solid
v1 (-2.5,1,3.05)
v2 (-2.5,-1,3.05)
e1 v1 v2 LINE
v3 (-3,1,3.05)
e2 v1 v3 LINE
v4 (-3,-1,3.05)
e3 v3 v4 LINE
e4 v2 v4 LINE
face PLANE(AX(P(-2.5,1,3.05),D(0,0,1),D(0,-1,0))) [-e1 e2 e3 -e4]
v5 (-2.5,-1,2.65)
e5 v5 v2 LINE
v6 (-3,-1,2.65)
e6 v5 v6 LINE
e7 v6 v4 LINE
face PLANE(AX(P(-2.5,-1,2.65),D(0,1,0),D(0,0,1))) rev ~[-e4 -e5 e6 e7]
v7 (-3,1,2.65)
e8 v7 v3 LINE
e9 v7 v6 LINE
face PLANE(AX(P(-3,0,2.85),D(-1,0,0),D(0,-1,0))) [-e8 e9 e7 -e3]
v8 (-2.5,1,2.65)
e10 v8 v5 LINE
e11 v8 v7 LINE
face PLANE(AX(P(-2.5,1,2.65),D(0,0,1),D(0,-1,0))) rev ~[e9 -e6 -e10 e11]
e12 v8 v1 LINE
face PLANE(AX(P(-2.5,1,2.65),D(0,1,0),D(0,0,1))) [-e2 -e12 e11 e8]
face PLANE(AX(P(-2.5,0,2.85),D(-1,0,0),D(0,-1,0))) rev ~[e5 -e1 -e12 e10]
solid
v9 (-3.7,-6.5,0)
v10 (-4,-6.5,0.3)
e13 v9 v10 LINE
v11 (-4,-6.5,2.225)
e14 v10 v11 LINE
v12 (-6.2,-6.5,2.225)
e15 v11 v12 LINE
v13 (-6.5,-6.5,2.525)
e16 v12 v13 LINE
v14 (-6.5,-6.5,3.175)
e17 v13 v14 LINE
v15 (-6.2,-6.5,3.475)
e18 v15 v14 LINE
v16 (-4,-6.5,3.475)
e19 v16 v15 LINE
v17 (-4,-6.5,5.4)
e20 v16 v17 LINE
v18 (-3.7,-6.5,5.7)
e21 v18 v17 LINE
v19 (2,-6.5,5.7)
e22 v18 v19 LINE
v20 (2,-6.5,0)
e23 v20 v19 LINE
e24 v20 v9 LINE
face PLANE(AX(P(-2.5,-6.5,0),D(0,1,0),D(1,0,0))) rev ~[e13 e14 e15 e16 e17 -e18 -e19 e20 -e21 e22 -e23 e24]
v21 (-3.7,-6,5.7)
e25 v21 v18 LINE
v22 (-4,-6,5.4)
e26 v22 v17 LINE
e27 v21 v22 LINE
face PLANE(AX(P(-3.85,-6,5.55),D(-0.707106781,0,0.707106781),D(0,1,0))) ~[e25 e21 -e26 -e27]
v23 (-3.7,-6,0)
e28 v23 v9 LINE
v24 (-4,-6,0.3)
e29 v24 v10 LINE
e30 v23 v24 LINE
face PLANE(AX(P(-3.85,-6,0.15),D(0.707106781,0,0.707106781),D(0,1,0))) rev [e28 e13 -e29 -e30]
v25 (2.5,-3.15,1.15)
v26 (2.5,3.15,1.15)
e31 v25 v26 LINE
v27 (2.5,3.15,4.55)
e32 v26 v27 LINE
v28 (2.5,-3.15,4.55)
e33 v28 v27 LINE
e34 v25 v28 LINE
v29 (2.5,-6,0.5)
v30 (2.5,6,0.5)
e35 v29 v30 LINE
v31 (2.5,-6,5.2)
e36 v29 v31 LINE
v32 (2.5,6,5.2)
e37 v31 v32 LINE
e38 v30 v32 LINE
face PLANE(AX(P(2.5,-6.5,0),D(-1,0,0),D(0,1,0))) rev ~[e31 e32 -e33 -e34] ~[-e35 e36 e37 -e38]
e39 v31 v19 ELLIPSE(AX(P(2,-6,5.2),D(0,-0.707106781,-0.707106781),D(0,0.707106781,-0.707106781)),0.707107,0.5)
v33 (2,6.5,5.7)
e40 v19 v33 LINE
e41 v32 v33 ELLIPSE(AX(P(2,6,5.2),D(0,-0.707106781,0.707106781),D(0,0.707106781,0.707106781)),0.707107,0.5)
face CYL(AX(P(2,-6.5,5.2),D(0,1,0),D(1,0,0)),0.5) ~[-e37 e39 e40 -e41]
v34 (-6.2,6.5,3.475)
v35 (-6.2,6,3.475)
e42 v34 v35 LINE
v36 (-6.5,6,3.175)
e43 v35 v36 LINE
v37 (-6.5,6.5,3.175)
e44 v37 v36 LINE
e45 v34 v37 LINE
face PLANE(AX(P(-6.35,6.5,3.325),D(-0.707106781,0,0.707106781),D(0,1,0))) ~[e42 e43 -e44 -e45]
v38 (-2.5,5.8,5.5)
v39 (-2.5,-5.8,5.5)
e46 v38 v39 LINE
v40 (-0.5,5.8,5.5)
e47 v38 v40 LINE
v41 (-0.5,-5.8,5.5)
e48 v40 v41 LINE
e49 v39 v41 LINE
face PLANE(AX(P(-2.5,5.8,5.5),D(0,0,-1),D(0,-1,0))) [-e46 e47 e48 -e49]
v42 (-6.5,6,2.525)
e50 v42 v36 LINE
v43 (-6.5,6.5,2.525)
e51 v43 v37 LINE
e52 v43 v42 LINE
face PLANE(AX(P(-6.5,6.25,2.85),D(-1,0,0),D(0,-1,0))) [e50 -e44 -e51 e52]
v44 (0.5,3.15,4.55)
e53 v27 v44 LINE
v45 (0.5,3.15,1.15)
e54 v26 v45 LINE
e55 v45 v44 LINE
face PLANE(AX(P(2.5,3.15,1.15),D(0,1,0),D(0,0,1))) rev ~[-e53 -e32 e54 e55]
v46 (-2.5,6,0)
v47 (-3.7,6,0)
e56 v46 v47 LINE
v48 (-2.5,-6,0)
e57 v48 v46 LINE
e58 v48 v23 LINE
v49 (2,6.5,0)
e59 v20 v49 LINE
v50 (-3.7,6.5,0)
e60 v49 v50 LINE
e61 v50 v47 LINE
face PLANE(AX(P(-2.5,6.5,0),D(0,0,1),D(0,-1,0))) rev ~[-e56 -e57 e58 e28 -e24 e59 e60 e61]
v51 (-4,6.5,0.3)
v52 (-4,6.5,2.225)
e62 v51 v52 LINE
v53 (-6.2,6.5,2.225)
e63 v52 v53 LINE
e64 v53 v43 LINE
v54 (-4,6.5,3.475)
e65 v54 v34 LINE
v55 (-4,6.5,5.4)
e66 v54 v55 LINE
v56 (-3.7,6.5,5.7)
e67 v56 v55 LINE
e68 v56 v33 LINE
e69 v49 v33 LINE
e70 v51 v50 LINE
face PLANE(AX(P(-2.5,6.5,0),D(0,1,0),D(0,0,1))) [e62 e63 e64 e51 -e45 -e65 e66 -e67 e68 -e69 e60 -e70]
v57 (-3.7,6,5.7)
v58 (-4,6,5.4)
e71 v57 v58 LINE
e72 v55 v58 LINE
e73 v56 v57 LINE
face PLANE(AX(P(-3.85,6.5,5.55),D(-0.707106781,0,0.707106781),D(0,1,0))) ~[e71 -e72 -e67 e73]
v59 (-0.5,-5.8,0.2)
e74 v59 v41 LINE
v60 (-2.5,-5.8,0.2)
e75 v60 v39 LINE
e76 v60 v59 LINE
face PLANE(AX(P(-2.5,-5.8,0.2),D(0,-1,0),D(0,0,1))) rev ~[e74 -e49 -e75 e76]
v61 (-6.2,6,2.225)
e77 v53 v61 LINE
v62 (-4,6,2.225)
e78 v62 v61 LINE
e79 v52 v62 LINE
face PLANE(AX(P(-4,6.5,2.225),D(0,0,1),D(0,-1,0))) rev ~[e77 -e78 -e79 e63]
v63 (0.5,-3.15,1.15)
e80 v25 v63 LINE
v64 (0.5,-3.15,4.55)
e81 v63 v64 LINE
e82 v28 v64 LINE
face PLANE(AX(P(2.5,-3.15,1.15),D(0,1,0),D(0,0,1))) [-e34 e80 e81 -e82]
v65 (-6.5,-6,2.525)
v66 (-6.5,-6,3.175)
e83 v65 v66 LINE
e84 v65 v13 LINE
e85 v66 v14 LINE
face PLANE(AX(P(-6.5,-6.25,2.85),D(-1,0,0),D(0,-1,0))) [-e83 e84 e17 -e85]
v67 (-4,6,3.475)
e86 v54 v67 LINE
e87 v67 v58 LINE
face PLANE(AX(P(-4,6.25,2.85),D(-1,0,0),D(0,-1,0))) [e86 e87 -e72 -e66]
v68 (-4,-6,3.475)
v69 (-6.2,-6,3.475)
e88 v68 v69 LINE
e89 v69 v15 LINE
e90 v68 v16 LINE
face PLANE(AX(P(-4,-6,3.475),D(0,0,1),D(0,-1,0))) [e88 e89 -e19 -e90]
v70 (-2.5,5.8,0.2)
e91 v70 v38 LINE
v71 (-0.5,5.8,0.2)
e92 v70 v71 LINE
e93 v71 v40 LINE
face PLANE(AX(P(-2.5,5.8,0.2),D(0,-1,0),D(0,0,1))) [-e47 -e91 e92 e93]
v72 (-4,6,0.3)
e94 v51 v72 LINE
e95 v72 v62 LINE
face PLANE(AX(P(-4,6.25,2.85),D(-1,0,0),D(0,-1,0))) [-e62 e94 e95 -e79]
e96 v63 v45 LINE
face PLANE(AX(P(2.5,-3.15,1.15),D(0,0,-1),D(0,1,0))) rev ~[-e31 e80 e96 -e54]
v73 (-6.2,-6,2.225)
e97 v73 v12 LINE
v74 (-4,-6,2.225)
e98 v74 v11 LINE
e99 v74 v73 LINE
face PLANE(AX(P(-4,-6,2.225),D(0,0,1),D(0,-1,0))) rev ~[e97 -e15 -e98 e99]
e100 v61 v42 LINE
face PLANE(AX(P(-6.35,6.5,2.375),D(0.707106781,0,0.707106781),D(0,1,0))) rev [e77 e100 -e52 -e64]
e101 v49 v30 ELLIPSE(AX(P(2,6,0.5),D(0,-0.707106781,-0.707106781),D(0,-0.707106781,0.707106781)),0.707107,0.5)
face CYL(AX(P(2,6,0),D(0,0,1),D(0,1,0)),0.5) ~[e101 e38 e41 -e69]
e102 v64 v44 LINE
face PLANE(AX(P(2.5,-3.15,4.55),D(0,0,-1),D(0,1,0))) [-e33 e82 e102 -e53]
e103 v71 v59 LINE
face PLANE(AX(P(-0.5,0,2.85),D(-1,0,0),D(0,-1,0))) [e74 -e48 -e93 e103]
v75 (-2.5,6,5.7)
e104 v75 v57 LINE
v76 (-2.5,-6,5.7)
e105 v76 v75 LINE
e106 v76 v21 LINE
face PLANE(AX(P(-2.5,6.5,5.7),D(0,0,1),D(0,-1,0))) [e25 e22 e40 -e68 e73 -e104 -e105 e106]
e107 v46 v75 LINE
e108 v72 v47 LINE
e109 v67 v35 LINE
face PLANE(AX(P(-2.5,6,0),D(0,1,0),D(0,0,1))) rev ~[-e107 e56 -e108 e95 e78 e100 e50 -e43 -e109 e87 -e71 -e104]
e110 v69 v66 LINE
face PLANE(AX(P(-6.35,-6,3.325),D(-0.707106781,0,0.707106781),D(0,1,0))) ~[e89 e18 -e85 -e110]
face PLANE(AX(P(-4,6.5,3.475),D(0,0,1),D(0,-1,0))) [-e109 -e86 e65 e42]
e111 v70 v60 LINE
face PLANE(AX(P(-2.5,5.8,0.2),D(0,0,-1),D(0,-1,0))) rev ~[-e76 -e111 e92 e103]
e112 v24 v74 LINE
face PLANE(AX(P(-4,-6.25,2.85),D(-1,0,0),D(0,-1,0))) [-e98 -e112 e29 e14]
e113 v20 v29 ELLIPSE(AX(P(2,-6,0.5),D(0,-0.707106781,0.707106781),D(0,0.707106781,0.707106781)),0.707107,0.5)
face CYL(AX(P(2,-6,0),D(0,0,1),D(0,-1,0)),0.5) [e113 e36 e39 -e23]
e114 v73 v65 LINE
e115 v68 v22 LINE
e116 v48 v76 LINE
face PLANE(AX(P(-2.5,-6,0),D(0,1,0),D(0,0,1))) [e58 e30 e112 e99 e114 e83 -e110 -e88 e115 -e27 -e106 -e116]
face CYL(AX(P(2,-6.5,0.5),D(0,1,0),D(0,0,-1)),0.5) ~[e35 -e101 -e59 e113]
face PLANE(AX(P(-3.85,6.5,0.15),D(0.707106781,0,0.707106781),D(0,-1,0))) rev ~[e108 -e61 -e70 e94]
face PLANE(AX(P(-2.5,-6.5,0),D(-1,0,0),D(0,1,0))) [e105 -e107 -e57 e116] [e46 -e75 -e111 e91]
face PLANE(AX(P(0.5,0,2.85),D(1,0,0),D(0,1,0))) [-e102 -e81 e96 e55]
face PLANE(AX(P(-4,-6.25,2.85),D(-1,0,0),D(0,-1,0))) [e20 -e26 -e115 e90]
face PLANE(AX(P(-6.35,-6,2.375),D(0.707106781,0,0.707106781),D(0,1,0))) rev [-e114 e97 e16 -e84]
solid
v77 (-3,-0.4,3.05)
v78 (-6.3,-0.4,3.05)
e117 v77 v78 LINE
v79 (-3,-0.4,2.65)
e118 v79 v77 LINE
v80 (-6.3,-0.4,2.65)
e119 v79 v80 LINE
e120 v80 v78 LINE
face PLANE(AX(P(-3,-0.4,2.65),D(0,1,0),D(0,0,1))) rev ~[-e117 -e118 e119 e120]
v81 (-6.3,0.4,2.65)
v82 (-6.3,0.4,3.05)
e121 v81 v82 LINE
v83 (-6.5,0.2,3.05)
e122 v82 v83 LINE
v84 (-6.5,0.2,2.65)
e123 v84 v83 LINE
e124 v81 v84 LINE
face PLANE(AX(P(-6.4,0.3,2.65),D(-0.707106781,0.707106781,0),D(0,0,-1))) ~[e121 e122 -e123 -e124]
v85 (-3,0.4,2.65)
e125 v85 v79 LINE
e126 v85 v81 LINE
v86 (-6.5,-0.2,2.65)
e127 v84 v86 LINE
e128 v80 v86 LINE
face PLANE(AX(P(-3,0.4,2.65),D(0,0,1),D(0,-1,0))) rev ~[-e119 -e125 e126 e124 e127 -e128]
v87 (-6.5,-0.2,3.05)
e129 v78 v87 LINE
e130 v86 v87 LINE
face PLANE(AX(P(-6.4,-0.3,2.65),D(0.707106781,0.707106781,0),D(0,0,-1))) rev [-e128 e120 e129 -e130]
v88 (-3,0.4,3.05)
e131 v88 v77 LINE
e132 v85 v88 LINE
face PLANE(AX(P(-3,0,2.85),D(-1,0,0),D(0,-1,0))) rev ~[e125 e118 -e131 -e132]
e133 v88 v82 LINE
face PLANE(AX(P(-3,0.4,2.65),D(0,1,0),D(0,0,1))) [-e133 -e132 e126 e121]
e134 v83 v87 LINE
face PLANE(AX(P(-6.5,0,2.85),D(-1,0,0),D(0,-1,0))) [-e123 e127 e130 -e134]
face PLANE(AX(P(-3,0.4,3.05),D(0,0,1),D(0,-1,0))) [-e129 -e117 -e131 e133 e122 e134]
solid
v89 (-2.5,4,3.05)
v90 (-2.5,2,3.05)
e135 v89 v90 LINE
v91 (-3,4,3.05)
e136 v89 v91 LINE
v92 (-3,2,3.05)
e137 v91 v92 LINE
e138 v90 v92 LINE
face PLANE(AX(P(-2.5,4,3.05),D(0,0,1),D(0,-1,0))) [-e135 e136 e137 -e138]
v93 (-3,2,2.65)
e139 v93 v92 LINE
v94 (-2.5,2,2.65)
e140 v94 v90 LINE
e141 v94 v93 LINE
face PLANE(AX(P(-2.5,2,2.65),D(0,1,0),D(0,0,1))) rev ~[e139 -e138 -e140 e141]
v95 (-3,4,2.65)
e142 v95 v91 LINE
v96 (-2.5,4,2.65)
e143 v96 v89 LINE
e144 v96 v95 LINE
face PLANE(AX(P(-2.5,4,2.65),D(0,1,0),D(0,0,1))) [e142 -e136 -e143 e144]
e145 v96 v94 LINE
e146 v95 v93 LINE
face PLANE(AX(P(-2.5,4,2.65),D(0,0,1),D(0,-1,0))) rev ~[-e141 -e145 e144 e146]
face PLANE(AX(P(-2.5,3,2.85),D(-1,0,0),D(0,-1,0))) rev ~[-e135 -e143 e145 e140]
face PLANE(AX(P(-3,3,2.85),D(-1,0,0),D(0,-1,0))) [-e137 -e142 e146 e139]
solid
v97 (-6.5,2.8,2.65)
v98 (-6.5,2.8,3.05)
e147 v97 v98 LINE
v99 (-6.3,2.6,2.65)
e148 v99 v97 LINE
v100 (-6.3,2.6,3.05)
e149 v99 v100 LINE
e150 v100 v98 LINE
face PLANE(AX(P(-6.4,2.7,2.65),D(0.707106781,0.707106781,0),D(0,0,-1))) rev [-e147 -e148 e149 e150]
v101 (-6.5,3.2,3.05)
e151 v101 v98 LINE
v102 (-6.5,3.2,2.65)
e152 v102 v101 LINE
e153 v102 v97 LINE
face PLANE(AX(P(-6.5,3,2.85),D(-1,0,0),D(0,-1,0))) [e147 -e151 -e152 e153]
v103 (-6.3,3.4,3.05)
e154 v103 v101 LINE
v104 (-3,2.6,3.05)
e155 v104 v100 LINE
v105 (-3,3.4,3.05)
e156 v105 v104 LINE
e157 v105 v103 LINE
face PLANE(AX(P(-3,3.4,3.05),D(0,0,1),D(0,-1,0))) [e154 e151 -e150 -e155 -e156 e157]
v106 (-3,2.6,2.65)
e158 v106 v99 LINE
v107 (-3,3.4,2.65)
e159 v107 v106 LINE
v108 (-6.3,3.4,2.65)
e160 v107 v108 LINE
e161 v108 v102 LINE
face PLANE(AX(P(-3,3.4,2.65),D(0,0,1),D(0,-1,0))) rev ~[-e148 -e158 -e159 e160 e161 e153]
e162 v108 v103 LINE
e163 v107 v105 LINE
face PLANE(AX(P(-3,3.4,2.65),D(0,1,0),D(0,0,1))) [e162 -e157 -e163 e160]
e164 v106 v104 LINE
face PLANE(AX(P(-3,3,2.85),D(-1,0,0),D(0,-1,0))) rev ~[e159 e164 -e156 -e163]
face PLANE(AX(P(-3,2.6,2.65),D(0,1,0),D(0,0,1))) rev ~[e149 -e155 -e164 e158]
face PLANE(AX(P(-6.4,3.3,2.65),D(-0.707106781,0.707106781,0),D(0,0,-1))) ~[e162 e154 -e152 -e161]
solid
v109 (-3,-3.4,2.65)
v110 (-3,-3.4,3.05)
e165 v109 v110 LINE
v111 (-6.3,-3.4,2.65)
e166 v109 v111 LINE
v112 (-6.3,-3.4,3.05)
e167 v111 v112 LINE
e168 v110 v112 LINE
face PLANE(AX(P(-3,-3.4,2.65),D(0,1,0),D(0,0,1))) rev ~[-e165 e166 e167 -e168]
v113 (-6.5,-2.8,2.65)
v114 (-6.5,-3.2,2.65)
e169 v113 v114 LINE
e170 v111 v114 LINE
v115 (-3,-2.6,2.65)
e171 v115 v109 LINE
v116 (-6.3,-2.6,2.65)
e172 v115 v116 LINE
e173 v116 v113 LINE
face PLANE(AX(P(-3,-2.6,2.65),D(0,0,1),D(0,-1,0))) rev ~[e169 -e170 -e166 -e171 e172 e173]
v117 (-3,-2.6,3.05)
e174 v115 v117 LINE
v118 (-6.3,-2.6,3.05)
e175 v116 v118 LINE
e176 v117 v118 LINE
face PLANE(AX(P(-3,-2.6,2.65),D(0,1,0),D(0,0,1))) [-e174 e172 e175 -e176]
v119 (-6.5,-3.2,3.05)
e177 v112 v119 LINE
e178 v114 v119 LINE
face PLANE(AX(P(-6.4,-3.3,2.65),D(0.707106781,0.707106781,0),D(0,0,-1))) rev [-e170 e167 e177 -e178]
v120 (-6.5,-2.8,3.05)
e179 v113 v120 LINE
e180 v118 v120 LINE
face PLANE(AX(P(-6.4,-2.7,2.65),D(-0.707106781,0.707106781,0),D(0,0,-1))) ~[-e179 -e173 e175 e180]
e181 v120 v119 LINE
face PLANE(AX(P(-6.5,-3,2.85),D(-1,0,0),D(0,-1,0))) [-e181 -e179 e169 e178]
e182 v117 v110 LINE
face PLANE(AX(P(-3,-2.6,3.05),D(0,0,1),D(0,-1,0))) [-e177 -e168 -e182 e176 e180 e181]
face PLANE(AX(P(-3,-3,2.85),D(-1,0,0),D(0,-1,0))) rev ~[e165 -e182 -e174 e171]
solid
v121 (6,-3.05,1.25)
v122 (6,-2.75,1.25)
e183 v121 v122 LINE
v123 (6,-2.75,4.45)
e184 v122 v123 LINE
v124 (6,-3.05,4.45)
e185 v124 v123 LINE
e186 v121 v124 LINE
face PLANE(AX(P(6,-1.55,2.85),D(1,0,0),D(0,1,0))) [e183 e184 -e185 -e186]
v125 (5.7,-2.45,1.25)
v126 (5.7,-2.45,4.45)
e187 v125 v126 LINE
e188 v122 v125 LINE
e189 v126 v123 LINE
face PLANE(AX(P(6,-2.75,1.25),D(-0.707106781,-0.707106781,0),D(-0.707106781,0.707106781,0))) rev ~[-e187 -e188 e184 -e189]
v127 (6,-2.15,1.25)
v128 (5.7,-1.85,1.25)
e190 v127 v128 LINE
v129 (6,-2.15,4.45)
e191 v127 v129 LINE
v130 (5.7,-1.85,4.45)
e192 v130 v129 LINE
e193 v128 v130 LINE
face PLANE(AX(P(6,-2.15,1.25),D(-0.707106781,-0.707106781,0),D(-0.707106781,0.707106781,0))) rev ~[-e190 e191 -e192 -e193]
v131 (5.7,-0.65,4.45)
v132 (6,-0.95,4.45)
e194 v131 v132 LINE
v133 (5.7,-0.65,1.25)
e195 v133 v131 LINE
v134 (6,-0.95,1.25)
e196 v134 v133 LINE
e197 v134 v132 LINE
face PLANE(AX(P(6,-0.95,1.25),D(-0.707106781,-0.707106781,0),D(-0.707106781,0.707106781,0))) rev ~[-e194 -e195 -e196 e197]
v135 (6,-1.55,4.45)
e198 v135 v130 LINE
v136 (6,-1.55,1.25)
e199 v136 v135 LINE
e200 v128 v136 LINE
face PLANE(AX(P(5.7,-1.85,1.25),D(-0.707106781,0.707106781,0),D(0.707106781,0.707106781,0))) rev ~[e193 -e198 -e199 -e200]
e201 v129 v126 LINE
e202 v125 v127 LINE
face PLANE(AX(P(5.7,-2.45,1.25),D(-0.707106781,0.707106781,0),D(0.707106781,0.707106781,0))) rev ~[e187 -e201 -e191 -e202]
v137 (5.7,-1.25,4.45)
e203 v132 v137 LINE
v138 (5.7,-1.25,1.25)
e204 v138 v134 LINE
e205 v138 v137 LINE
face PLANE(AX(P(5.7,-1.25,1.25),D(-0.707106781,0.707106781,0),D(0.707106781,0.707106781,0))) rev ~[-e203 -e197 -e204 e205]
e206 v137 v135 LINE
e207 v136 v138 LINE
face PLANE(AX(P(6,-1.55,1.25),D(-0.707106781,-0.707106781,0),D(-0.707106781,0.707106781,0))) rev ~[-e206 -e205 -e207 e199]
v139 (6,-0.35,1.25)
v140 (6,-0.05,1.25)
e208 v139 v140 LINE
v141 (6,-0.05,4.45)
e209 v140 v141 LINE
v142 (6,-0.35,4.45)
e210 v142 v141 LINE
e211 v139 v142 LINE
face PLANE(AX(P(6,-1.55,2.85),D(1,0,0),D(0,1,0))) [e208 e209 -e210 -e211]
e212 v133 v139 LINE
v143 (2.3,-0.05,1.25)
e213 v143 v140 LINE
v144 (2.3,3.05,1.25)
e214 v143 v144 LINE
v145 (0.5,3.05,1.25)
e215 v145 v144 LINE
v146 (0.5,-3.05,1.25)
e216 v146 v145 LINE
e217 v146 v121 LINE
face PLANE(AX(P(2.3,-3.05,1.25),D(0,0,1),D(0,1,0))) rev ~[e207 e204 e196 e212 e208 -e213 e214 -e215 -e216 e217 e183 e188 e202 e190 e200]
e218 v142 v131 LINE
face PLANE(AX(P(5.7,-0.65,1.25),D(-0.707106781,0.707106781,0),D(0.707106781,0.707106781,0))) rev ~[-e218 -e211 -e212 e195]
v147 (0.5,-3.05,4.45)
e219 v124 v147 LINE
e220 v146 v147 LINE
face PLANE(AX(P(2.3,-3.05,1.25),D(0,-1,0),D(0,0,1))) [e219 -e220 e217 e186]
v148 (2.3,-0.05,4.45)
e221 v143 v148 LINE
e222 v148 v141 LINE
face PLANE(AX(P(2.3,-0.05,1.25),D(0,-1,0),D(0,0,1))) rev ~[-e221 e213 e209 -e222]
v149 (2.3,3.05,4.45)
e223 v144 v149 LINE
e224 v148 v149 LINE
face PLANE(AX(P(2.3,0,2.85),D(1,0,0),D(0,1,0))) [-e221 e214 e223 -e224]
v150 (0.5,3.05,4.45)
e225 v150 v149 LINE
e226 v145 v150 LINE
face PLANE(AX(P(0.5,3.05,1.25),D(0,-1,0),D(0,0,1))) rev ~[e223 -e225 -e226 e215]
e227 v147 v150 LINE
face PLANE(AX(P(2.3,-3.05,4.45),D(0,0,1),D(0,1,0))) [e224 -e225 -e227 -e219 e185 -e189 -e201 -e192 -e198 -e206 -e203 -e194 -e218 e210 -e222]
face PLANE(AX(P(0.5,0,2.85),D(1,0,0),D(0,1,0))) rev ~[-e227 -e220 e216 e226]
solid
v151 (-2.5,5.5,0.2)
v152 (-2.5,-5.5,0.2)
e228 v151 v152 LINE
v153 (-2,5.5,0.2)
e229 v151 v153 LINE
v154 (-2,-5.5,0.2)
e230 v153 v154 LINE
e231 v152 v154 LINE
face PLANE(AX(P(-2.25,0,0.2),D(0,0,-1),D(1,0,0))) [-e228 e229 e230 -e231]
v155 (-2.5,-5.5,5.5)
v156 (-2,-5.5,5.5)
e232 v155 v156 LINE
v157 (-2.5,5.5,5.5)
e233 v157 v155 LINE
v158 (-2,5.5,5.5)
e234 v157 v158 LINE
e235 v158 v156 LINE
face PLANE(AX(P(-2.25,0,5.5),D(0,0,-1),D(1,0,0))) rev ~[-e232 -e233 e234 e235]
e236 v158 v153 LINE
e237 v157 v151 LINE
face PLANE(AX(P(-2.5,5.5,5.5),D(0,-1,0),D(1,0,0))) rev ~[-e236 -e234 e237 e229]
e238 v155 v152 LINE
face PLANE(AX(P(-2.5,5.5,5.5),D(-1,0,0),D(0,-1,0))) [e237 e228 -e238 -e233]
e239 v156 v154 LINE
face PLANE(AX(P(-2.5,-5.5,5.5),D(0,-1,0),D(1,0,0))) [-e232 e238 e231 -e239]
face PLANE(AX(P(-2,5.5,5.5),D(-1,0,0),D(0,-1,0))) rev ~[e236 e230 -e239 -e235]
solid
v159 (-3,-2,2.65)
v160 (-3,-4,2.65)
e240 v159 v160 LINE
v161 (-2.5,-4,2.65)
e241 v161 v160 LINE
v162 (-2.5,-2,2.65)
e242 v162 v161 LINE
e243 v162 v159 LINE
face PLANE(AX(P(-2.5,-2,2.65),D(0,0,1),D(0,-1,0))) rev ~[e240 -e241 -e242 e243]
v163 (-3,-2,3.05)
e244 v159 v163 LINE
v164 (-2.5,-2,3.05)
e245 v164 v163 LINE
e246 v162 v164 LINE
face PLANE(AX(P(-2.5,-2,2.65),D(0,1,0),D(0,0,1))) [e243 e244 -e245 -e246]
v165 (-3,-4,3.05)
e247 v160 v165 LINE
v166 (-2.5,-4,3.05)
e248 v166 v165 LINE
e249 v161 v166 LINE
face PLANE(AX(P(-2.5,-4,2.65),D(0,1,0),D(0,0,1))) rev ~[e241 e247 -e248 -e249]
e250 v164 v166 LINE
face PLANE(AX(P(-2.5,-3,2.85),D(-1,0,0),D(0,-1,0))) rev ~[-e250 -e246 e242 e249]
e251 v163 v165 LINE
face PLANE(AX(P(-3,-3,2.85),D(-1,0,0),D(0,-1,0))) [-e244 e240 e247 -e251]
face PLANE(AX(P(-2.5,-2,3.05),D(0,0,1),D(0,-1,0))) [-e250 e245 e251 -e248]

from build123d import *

# Parameters (mm, degrees)
F0_W       = 5
F0_H       = 13
F1_DEPTH   = 5.7
F2_W       = 6.3
F2_H       = 3.4
F3_DEPTH   = 2
F4_W       = 6.1
F4_H       = 3.2
F5_DEPTH   = 1.8
F6_W       = 3
F6_H       = 3.2
F7_DEPTH   = 3.7
F8_W       = 0.5
F8_H       = 5.7
F9_DEPTH   = 1.5
F10_R      = 0.5
F11_W      = 11.6
F11_H      = 5.3
F12_DEPTH  = 2
F13_W      = 0.5
F13_H      = 11
F14_DEPTH  = 5.3
F17_DEPTH  = 25
F15_W      = 2
F15_H      = 0.4
F18_DEPTH  = 0.5
F19_W      = 0.8
F19_H      = 0.4
F22_DEPTH  = 3.5
F20_W      = 0.8
F20_H      = 0.4
F21_W      = 0.8
F21_H      = 0.4
F23_W      = 0.5
F23_H      = 1.25
F24_W      = 0.5
F24_H      = 1.25
F25_DEPTH  = 2.5
F26_SIZE   = 0.2
F26_2_SIZE = 0.2
F26_3_SIZE = 0.2
F27_SIZE   = 0.3
F28_SIZE   = 0.3


with BuildPart() as f1:
    # F0 (on Top) → F1 (new body)
    with BuildSketch(Plane.XY):
        Rectangle(F0_W, F0_H)
    extrude(amount=F1_DEPTH)

    # F2 (on face) → F3 (cut)
    with BuildSketch(Plane.YZ.offset(2.5)):
        with Locations((0, 2.85)):
            Rectangle(F2_W, F2_H)
    extrude(amount=-F3_DEPTH, mode=Mode.SUBTRACT)

    # F8 (on face) → F9 (join)
    with BuildSketch(Plane(origin=(-2.5, 0, 0), x_dir=(0, -1, 0), z_dir=(-1, 0, 0))):
        with Locations((-6.25, 2.85)):
            Rectangle(F8_W, F8_H)
        with Locations((6.25, 2.85)):
            Rectangle(F8_W, F8_H)
    extrude(amount=F9_DEPTH)

    # F10
    f10_edges = [f1.edges().sort_by_distance(p)[0] for p in [
        (2.5, 0, 5.7),
        (2.5, 6.5, 2.85),
        (2.5, 0, 0),
        (2.5, -6.5, 2.85),
    ]]
    fillet(f10_edges, radius=F10_R)

    # F11 (on face) → F12 (cut)
    with BuildSketch(Plane(origin=(-2.5, 0, 0), x_dir=(0, -1, 0), z_dir=(-1, 0, 0))):
        with Locations((0, 2.85)):
            Rectangle(F11_W, F11_H)
    extrude(amount=-F12_DEPTH, mode=Mode.SUBTRACT)

    # F23 (on face) + F24 (on face) → F25 (join)
    with BuildSketch(Plane(origin=(-4, 0, 0), x_dir=(0, -1, 0), z_dir=(-1, 0, 0))):
        with Locations((-6.25, 2.85)):
            Rectangle(F23_W, F23_H)
    with BuildSketch(Plane(origin=(-4, 0, 0), x_dir=(0, -1, 0), z_dir=(-1, 0, 0))):
        with Locations((6.25, 2.85)):
            Rectangle(F24_W, F24_H)
    extrude(amount=F25_DEPTH)

    # F27
    f27_edges = [f1.edges().sort_by_distance(p)[0] for p in [
        (-6.5, -6.25, 3.475),
        (-6.5, -6.25, 2.225),
        (-6.5, 6.25, 3.475),
        (-6.5, 6.25, 2.225),
    ]]
    chamfer(f27_edges, length=F27_SIZE)

    # F28
    f28_edges = [f1.edges().sort_by_distance(p)[0] for p in [
        (-4, 6.25, 5.7),
        (-4, 6.25, 0),
        (-4, -6.25, 5.7),
        (-4, -6.25, 0),
    ]]
    chamfer(f28_edges, length=F28_SIZE)


with BuildPart() as f5:
    # F4 (on face) → F5 (new body)
    with BuildSketch(Plane.YZ.offset(0.5)):
        with Locations((0, 2.85)):
            Rectangle(F4_W, F4_H)
    extrude(amount=F5_DEPTH)

    # F6 (on face) → F7 (join)
    with BuildSketch(Plane.YZ.offset(2.3)):
        with Locations((-1.55, 2.85)):
            Rectangle(F6_W, F6_H)
    extrude(amount=F7_DEPTH)

    # F16 (on face) → F17 (cut)
    with BuildSketch(Plane(origin=(0, 0, 1.25), x_dir=(1, 0, 0), z_dir=(0, 0, -1))):
        Polygon((6, 2.15), (6, 2.75), (5.7, 2.45), align=None)
        Polygon((6, 1.55), (6, 2.15), (5.7, 1.85), align=None)
        Polygon((6, 0.95), (6, 1.55), (5.7, 1.25), align=None)
        Polygon((6, 0.35), (6, 0.95), (5.7, 0.65), align=None)
    extrude(amount=-F17_DEPTH, mode=Mode.SUBTRACT)


with BuildPart() as f14:
    # F13 (on face) → F14 (new body)
    with BuildSketch(Plane(origin=(0, 0, 5.5), x_dir=(1, 0, 0), z_dir=(0, 0, -1))):
        with Locations((-2.25, 0)):
            Rectangle(F13_W, F13_H)
    extrude(amount=F14_DEPTH)


with BuildPart() as f18:
    # F15 (on face) → F18 (new body)
    with BuildSketch(Plane(origin=(-2.5, 0, 0), x_dir=(0, -1, 0), z_dir=(-1, 0, 0))):
        with Locations((-3, 2.85)):
            Rectangle(F15_W, F15_H)
    extrude(amount=F18_DEPTH)


with BuildPart() as f18b:
    # F15 (on face) → F18, piece 2 (new body)
    with BuildSketch(Plane(origin=(-2.5, 0, 0), x_dir=(0, -1, 0), z_dir=(-1, 0, 0))):
        with Locations((0, 2.85)):
            Rectangle(F15_W, F15_H)
    extrude(amount=F18_DEPTH)


with BuildPart() as f18c:
    # F15 (on face) → F18, piece 3 (new body)
    with BuildSketch(Plane(origin=(-2.5, 0, 0), x_dir=(0, -1, 0), z_dir=(-1, 0, 0))):
        with Locations((3, 2.85)):
            Rectangle(F15_W, F15_H)
    extrude(amount=F18_DEPTH)


with BuildPart() as f22:
    # F19 (on face) → F22 (new body)
    with BuildSketch(Plane(origin=(-3, 0, 0), x_dir=(0, -1, 0), z_dir=(-1, 0, 0))):
        with Locations((-3, 2.85)):
            Rectangle(F19_W, F19_H)
    extrude(amount=F22_DEPTH)

    # F26
    f26_edges = [f22.edges().sort_by_distance(p)[0] for p in [
        (-6.5, 3.4, 2.85),
        (-6.5, 2.6, 2.85),
    ]]
    chamfer(f26_edges, length=F26_SIZE)


with BuildPart() as f22b:
    # F20 (on face) → F22, piece 2 (new body)
    with BuildSketch(Plane(origin=(-3, 0, 0), x_dir=(0, -1, 0), z_dir=(-1, 0, 0))):
        with Locations((0, 2.85)):
            Rectangle(F20_W, F20_H)
    extrude(amount=F22_DEPTH)

    # F26#2
    f26_2_edges = [f22b.edges().sort_by_distance(p)[0] for p in [
        (-6.5, 0.4, 2.85),
        (-6.5, -0.4, 2.85),
    ]]
    chamfer(f26_2_edges, length=F26_2_SIZE)


with BuildPart() as f22c:
    # F21 (on face) → F22, piece 3 (new body)
    with BuildSketch(Plane(origin=(-3, 0, 0), x_dir=(0, -1, 0), z_dir=(-1, 0, 0))):
        with Locations((3, 2.85)):
            Rectangle(F21_W, F21_H)
    extrude(amount=F22_DEPTH)

    # F26#3
    f26_3_edges = [f22c.edges().sort_by_distance(p)[0] for p in [
        (-6.5, -2.6, 2.85),
        (-6.5, -3.4, 2.85),
    ]]
    chamfer(f26_3_edges, length=F26_3_SIZE)


solid = Compound([f1.part, f5.part, f14.part, f18.part, f18b.part, f18c.part, f22.part, f22b.part, f22c.part])
